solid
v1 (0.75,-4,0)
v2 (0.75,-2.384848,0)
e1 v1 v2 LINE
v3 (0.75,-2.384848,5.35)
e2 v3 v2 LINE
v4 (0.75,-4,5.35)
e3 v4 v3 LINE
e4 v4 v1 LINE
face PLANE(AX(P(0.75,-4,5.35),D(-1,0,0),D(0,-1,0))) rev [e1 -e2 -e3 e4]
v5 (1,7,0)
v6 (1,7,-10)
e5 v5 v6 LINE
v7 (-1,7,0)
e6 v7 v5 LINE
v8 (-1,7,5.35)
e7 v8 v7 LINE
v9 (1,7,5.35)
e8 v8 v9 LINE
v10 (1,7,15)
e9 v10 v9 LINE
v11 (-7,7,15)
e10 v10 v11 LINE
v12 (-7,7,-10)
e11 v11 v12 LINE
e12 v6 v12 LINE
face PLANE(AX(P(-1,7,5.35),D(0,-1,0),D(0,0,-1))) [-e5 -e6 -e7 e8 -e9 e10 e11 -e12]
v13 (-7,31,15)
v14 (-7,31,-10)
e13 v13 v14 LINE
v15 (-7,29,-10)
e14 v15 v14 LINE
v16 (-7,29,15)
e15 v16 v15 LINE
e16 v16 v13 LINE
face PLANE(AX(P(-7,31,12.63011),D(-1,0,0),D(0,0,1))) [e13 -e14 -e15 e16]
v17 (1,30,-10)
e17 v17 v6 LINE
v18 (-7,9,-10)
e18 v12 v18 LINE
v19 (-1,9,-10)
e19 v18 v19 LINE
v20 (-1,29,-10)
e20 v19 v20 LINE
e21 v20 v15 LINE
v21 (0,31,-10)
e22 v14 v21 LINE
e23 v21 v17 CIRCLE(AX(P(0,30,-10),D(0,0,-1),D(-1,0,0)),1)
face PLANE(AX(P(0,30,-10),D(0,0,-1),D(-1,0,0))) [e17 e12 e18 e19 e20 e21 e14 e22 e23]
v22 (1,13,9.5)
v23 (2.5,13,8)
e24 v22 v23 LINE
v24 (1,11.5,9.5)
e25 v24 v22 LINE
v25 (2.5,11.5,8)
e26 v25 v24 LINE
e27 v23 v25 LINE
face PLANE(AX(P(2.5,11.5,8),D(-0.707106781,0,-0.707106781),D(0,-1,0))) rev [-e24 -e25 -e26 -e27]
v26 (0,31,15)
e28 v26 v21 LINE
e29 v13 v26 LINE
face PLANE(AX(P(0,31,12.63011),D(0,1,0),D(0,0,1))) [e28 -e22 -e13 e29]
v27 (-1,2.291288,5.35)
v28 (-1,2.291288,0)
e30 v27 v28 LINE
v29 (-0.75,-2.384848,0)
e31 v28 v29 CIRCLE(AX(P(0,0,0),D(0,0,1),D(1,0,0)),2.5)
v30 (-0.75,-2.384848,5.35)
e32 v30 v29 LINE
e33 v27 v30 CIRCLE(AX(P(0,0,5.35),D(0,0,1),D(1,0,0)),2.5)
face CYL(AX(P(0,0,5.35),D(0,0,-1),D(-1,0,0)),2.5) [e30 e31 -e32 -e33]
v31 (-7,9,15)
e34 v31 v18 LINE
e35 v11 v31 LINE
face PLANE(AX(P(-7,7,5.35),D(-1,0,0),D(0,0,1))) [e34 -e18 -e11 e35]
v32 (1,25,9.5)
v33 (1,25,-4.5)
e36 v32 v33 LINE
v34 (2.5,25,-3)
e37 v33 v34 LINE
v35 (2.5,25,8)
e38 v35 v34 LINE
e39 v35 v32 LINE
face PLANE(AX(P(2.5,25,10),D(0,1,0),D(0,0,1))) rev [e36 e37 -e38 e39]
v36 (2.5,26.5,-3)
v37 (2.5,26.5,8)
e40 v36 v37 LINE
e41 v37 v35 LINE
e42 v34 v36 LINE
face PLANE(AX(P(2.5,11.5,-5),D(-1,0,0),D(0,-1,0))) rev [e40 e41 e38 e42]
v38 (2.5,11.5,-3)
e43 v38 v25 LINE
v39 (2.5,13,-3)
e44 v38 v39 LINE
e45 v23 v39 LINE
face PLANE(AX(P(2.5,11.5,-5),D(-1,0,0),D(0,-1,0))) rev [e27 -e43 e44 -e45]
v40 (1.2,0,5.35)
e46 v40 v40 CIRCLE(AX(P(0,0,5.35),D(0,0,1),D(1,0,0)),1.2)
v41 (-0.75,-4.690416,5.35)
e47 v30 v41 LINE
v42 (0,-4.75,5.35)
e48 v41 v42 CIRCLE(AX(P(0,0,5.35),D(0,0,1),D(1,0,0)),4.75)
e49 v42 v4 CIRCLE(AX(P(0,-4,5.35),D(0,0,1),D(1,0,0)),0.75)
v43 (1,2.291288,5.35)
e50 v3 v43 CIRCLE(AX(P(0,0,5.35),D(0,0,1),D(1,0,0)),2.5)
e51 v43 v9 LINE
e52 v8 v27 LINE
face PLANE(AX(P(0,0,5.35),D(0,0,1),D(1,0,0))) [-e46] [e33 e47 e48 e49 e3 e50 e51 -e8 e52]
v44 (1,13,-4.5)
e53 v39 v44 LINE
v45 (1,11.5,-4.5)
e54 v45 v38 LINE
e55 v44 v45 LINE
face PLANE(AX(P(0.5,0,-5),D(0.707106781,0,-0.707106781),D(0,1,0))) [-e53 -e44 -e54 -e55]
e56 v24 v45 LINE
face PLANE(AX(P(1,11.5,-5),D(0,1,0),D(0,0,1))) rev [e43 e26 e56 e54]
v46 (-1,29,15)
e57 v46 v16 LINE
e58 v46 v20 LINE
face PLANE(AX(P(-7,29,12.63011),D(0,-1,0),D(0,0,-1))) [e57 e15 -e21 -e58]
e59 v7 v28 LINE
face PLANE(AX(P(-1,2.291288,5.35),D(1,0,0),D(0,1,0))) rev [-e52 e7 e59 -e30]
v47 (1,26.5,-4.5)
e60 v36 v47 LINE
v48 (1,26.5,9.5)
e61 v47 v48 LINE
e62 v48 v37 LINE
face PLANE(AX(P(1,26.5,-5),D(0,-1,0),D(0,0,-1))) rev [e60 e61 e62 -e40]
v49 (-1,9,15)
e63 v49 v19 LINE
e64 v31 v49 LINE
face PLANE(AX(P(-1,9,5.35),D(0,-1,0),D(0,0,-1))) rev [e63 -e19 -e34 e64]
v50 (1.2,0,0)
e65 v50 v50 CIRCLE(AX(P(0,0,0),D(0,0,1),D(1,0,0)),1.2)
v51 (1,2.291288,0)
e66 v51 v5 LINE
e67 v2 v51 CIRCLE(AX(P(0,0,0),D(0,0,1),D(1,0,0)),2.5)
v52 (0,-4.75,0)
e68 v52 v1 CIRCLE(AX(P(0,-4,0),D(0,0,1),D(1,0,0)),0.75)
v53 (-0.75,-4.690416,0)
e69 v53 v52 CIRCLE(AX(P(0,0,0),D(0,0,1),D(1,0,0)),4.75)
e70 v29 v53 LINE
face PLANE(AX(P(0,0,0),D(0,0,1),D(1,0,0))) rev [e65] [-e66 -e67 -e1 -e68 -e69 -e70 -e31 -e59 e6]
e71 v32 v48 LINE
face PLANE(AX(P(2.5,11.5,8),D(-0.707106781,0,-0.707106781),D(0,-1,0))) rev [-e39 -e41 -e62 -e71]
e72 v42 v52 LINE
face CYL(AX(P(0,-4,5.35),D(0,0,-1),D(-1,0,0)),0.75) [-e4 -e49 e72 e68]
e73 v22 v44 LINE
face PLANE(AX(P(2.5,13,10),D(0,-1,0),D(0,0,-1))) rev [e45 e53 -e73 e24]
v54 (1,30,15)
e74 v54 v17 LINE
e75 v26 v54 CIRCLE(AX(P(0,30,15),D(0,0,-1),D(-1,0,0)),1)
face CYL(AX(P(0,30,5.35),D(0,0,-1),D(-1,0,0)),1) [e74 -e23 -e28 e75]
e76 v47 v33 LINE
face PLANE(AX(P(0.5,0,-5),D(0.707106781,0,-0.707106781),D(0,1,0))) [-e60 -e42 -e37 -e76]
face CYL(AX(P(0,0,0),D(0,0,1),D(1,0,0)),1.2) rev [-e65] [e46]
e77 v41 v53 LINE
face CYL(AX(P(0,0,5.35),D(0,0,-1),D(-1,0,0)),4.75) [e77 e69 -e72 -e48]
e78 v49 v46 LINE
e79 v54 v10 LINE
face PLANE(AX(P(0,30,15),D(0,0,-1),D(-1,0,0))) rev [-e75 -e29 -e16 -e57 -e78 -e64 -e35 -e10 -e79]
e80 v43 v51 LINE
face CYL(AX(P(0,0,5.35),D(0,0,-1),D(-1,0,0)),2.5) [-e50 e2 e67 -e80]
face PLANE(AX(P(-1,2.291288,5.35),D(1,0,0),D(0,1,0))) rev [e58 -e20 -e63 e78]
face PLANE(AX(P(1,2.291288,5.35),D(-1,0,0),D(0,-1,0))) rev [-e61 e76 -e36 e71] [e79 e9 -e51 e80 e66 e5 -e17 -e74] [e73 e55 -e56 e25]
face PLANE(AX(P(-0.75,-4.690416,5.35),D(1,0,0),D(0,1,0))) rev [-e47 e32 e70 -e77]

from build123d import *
from build123d.topology import SkipClean

# Parameters (mm, degrees)
LEVER_R                       = 1
BOSS_EXTRUDE1_DEPTH           = 5.35
SKETCH1_R                     = 1.2
CUT_EXTRUDE1_DEPTH            = 32.557448
UPPERJAW_DEPTH                = 5.35
SKETCH5_W                     = 6
SKETCH5_H                     = 2
LOWERJAW_DEPTH                = 5.35
BANDCAPTURE_DEPTH             = 5
BANDCAPTURE_DEPTH_BACK        = 10
SKETCH6_W                     = 1.5
SKETCH6_H                     = 15
CUT_EXTRUDE3_DEPTH            = 34.316662
CUT_EXTRUDE3_DEPTH_BACK       = 34.316662
SKETCH7_W                     = 1.5
SKETCH7_H                     = 12
BATTERYCRADLEWIDTH_DEPTH      = 10
BATTERYCRADLEWIDTH_DEPTH_BACK = 15
CHAMFER1_SIZE                 = 2


with BuildPart() as part:
    # lever → Boss-Extrude1 (new body)
    with BuildSketch(Plane.XY):
        with BuildLine():
            Line((-0.75, -4.690416), (-0.75, -2.384848))
            ThreePointArc((-0.75, -2.384848), (-2.496435, -0.133467), (-1, 2.291288))
            Line((-1, 2.291288), (-1, 30))
            ThreePointArc((-1, 30), (0, 31), (1, 30))
            Line((1, 30), (1, 2.291288))
            ThreePointArc((1, 2.291288), (2.496435, -0.133467), (0.75, -2.384848))
            Line((0.75, -2.384848), (0.75, -4))
            ThreePointArc((0.75, -4), (0.53033, -4.53033), (0, -4.75))
            ThreePointArc((0, -4.75), (-0.376182, -4.735081), (-0.75, -4.690416))
        make_face()
        Circle(LEVER_R, mode=Mode.SUBTRACT)
    extrude(amount=BOSS_EXTRUDE1_DEPTH)

    # Sketch1 → Cut-Extrude1 (cut, through all)
    with BuildSketch(Plane.XY.offset(5.35)):
        Circle(SKETCH1_R)
    extrude(amount=-CUT_EXTRUDE1_DEPTH, mode=Mode.SUBTRACT)

    # Sketch4 → UpperJaw (add)
    with BuildSketch(Plane(origin=(0, 0, 0), x_dir=(-1, 0, 0), z_dir=(0, 0, -1))):
        with BuildLine():
            Line((0, 31), (7, 31))
            Line((7, 31), (7, 29))
            Line((7, 29), (1, 29))
            Line((1, 29), (1, 30))
            ThreePointArc((1, 30), (0.707107, 30.707107), (0, 31))
        make_face()
    extrude(amount=-UPPERJAW_DEPTH)

    # Sketch5 → LowerJaw (add, through all)
    with BuildSketch(Plane(origin=(0, 0, 0), x_dir=(-1, 0, 0), z_dir=(0, 0, -1))):
        with Locations((4, 8)):
            Rectangle(SKETCH5_W, SKETCH5_H)
    extrude(amount=-LOWERJAW_DEPTH)

    # Sketch6 → BandCapture (add, two sides: drawn at the far end of the back side and taken through both)
    with BuildSketch(Plane(origin=(0, 0, 0), x_dir=(-1, 0, 0), z_dir=(0, 0, -1)).offset(-BANDCAPTURE_DEPTH_BACK)):
        with Locations((-1.75, 19)):
            Rectangle(SKETCH6_W, SKETCH6_H)
    extrude(amount=BANDCAPTURE_DEPTH + BANDCAPTURE_DEPTH_BACK)

    # Sketch7 → Cut-Extrude3 (cut, two sides: drawn at the far end of the back side and taken through both)
    with BuildSketch(Plane(origin=(0, 0, 0), x_dir=(-1, 0, 0), z_dir=(0, 0, -1)).offset(-CUT_EXTRUDE3_DEPTH_BACK)):
        with Locations((-1.75, 19)):
            Rectangle(SKETCH7_W, SKETCH7_H)
    extrude(amount=CUT_EXTRUDE3_DEPTH + CUT_EXTRUDE3_DEPTH_BACK, mode=Mode.SUBTRACT)

    # Sketch8 → BatteryCradleWidth (add, two sides: drawn at the far end of the back side and taken through both)
    with SkipClean():  # the faces are left unmerged after this step: merging them gives an invalid solid
        with BuildSketch(Plane(origin=(0, 0, 0), x_dir=(-1, 0, 0), z_dir=(0, 0, -1)).offset(-BATTERYCRADLEWIDTH_DEPTH_BACK)):
            with BuildLine():
                Line((-1, 7), (7, 7))
                Line((7, 7), (7, 9))
                Line((7, 9), (1, 9))
                Line((1, 9), (1, 29))
                Line((1, 29), (7, 29))
                Line((7, 29), (7, 31))
                Line((7, 31), (0, 31))
                ThreePointArc((0, 31), (-0.707107, 30.707107), (-1, 30))
                Line((-1, 30), (-1, 7))
            make_face()
        extrude(amount=BATTERYCRADLEWIDTH_DEPTH + BATTERYCRADLEWIDTH_DEPTH_BACK)

    # Chamfer1
    # the kernel refuses this chamfer: 2 mm, written as the material it takes off along each edge
    with BuildSketch(Plane(origin=(2.5, 19.856634, 10), x_dir=(-0.9996219169112968, 0, 0.027495876610586487), z_dir=(0, 1, 0))) as chamfer1_piece_1_section:
        Polygon((CHAMFER1_SIZE * 0.999621916911, -CHAMFER1_SIZE * 0.0274958766106), (-CHAMFER1_SIZE * 0.0274958766106, -CHAMFER1_SIZE * 0.999621916911), (0, 0), align=None)
    chamfer1_piece_1 = extrude(amount=11.786732, mode=Mode.PRIVATE)
    chamfer1_piece_1 = split(chamfer1_piece_1, bisect_by=Plane(origin=(1, 25.75, 9.296082), z_dir=(1, 0, 0)), keep=Keep.TOP, mode=Mode.PRIVATE)
    add(chamfer1_piece_1, mode=Mode.SUBTRACT)
    with BuildSketch(Plane(origin=(2.5, 6.356634, 10), x_dir=(-0.9996219169112968, 0, 0.027495876610586487), z_dir=(0, 1, 0))) as chamfer1_piece_2_section:
        Polygon((CHAMFER1_SIZE * 0.999621916911, -CHAMFER1_SIZE * 0.0274958766106), (-CHAMFER1_SIZE * 0.0274958766106, -CHAMFER1_SIZE * 0.999621916911), (0, 0), align=None)
    chamfer1_piece_2 = extrude(amount=11.786732, mode=Mode.PRIVATE)
    chamfer1_piece_2 = split(chamfer1_piece_2, bisect_by=Plane(origin=(1, 12.25, 9.296082), z_dir=(1, 0, 0)), keep=Keep.TOP, mode=Mode.PRIVATE)
    add(chamfer1_piece_2, mode=Mode.SUBTRACT)
    with BuildSketch(Plane(origin=(2.5, 6.356634, -5), x_dir=(-0.9996219169112968, 0, -0.027495876610586487), z_dir=(0, 1, 0))) as chamfer1_piece_3_section:
        Polygon((CHAMFER1_SIZE * 0.999621916911, CHAMFER1_SIZE * 0.0274958766106), (-CHAMFER1_SIZE * 0.0274958766106, CHAMFER1_SIZE * 0.999621916911), (0, 0), align=None)
    chamfer1_piece_3 = extrude(amount=11.786732, mode=Mode.PRIVATE)
    chamfer1_piece_3 = split(chamfer1_piece_3, bisect_by=Plane(origin=(1, 12.25, -4.296082), z_dir=(1, 0, 0)), keep=Keep.TOP, mode=Mode.PRIVATE)
    add(chamfer1_piece_3, mode=Mode.SUBTRACT)
    with BuildSketch(Plane(origin=(2.5, 19.856634, -5), x_dir=(-0.9996219169112968, 0, -0.027495876610586487), z_dir=(0, 1, 0))) as chamfer1_piece_4_section:
        Polygon((CHAMFER1_SIZE * 0.999621916911, CHAMFER1_SIZE * 0.0274958766106), (-CHAMFER1_SIZE * 0.0274958766106, CHAMFER1_SIZE * 0.999621916911), (0, 0), align=None)
    chamfer1_piece_4 = extrude(amount=11.786732, mode=Mode.PRIVATE)
    chamfer1_piece_4 = split(chamfer1_piece_4, bisect_by=Plane(origin=(1, 25.75, -4.296082), z_dir=(1, 0, 0)), keep=Keep.TOP, mode=Mode.PRIVATE)
    add(chamfer1_piece_4, mode=Mode.SUBTRACT)


solid = part.part
